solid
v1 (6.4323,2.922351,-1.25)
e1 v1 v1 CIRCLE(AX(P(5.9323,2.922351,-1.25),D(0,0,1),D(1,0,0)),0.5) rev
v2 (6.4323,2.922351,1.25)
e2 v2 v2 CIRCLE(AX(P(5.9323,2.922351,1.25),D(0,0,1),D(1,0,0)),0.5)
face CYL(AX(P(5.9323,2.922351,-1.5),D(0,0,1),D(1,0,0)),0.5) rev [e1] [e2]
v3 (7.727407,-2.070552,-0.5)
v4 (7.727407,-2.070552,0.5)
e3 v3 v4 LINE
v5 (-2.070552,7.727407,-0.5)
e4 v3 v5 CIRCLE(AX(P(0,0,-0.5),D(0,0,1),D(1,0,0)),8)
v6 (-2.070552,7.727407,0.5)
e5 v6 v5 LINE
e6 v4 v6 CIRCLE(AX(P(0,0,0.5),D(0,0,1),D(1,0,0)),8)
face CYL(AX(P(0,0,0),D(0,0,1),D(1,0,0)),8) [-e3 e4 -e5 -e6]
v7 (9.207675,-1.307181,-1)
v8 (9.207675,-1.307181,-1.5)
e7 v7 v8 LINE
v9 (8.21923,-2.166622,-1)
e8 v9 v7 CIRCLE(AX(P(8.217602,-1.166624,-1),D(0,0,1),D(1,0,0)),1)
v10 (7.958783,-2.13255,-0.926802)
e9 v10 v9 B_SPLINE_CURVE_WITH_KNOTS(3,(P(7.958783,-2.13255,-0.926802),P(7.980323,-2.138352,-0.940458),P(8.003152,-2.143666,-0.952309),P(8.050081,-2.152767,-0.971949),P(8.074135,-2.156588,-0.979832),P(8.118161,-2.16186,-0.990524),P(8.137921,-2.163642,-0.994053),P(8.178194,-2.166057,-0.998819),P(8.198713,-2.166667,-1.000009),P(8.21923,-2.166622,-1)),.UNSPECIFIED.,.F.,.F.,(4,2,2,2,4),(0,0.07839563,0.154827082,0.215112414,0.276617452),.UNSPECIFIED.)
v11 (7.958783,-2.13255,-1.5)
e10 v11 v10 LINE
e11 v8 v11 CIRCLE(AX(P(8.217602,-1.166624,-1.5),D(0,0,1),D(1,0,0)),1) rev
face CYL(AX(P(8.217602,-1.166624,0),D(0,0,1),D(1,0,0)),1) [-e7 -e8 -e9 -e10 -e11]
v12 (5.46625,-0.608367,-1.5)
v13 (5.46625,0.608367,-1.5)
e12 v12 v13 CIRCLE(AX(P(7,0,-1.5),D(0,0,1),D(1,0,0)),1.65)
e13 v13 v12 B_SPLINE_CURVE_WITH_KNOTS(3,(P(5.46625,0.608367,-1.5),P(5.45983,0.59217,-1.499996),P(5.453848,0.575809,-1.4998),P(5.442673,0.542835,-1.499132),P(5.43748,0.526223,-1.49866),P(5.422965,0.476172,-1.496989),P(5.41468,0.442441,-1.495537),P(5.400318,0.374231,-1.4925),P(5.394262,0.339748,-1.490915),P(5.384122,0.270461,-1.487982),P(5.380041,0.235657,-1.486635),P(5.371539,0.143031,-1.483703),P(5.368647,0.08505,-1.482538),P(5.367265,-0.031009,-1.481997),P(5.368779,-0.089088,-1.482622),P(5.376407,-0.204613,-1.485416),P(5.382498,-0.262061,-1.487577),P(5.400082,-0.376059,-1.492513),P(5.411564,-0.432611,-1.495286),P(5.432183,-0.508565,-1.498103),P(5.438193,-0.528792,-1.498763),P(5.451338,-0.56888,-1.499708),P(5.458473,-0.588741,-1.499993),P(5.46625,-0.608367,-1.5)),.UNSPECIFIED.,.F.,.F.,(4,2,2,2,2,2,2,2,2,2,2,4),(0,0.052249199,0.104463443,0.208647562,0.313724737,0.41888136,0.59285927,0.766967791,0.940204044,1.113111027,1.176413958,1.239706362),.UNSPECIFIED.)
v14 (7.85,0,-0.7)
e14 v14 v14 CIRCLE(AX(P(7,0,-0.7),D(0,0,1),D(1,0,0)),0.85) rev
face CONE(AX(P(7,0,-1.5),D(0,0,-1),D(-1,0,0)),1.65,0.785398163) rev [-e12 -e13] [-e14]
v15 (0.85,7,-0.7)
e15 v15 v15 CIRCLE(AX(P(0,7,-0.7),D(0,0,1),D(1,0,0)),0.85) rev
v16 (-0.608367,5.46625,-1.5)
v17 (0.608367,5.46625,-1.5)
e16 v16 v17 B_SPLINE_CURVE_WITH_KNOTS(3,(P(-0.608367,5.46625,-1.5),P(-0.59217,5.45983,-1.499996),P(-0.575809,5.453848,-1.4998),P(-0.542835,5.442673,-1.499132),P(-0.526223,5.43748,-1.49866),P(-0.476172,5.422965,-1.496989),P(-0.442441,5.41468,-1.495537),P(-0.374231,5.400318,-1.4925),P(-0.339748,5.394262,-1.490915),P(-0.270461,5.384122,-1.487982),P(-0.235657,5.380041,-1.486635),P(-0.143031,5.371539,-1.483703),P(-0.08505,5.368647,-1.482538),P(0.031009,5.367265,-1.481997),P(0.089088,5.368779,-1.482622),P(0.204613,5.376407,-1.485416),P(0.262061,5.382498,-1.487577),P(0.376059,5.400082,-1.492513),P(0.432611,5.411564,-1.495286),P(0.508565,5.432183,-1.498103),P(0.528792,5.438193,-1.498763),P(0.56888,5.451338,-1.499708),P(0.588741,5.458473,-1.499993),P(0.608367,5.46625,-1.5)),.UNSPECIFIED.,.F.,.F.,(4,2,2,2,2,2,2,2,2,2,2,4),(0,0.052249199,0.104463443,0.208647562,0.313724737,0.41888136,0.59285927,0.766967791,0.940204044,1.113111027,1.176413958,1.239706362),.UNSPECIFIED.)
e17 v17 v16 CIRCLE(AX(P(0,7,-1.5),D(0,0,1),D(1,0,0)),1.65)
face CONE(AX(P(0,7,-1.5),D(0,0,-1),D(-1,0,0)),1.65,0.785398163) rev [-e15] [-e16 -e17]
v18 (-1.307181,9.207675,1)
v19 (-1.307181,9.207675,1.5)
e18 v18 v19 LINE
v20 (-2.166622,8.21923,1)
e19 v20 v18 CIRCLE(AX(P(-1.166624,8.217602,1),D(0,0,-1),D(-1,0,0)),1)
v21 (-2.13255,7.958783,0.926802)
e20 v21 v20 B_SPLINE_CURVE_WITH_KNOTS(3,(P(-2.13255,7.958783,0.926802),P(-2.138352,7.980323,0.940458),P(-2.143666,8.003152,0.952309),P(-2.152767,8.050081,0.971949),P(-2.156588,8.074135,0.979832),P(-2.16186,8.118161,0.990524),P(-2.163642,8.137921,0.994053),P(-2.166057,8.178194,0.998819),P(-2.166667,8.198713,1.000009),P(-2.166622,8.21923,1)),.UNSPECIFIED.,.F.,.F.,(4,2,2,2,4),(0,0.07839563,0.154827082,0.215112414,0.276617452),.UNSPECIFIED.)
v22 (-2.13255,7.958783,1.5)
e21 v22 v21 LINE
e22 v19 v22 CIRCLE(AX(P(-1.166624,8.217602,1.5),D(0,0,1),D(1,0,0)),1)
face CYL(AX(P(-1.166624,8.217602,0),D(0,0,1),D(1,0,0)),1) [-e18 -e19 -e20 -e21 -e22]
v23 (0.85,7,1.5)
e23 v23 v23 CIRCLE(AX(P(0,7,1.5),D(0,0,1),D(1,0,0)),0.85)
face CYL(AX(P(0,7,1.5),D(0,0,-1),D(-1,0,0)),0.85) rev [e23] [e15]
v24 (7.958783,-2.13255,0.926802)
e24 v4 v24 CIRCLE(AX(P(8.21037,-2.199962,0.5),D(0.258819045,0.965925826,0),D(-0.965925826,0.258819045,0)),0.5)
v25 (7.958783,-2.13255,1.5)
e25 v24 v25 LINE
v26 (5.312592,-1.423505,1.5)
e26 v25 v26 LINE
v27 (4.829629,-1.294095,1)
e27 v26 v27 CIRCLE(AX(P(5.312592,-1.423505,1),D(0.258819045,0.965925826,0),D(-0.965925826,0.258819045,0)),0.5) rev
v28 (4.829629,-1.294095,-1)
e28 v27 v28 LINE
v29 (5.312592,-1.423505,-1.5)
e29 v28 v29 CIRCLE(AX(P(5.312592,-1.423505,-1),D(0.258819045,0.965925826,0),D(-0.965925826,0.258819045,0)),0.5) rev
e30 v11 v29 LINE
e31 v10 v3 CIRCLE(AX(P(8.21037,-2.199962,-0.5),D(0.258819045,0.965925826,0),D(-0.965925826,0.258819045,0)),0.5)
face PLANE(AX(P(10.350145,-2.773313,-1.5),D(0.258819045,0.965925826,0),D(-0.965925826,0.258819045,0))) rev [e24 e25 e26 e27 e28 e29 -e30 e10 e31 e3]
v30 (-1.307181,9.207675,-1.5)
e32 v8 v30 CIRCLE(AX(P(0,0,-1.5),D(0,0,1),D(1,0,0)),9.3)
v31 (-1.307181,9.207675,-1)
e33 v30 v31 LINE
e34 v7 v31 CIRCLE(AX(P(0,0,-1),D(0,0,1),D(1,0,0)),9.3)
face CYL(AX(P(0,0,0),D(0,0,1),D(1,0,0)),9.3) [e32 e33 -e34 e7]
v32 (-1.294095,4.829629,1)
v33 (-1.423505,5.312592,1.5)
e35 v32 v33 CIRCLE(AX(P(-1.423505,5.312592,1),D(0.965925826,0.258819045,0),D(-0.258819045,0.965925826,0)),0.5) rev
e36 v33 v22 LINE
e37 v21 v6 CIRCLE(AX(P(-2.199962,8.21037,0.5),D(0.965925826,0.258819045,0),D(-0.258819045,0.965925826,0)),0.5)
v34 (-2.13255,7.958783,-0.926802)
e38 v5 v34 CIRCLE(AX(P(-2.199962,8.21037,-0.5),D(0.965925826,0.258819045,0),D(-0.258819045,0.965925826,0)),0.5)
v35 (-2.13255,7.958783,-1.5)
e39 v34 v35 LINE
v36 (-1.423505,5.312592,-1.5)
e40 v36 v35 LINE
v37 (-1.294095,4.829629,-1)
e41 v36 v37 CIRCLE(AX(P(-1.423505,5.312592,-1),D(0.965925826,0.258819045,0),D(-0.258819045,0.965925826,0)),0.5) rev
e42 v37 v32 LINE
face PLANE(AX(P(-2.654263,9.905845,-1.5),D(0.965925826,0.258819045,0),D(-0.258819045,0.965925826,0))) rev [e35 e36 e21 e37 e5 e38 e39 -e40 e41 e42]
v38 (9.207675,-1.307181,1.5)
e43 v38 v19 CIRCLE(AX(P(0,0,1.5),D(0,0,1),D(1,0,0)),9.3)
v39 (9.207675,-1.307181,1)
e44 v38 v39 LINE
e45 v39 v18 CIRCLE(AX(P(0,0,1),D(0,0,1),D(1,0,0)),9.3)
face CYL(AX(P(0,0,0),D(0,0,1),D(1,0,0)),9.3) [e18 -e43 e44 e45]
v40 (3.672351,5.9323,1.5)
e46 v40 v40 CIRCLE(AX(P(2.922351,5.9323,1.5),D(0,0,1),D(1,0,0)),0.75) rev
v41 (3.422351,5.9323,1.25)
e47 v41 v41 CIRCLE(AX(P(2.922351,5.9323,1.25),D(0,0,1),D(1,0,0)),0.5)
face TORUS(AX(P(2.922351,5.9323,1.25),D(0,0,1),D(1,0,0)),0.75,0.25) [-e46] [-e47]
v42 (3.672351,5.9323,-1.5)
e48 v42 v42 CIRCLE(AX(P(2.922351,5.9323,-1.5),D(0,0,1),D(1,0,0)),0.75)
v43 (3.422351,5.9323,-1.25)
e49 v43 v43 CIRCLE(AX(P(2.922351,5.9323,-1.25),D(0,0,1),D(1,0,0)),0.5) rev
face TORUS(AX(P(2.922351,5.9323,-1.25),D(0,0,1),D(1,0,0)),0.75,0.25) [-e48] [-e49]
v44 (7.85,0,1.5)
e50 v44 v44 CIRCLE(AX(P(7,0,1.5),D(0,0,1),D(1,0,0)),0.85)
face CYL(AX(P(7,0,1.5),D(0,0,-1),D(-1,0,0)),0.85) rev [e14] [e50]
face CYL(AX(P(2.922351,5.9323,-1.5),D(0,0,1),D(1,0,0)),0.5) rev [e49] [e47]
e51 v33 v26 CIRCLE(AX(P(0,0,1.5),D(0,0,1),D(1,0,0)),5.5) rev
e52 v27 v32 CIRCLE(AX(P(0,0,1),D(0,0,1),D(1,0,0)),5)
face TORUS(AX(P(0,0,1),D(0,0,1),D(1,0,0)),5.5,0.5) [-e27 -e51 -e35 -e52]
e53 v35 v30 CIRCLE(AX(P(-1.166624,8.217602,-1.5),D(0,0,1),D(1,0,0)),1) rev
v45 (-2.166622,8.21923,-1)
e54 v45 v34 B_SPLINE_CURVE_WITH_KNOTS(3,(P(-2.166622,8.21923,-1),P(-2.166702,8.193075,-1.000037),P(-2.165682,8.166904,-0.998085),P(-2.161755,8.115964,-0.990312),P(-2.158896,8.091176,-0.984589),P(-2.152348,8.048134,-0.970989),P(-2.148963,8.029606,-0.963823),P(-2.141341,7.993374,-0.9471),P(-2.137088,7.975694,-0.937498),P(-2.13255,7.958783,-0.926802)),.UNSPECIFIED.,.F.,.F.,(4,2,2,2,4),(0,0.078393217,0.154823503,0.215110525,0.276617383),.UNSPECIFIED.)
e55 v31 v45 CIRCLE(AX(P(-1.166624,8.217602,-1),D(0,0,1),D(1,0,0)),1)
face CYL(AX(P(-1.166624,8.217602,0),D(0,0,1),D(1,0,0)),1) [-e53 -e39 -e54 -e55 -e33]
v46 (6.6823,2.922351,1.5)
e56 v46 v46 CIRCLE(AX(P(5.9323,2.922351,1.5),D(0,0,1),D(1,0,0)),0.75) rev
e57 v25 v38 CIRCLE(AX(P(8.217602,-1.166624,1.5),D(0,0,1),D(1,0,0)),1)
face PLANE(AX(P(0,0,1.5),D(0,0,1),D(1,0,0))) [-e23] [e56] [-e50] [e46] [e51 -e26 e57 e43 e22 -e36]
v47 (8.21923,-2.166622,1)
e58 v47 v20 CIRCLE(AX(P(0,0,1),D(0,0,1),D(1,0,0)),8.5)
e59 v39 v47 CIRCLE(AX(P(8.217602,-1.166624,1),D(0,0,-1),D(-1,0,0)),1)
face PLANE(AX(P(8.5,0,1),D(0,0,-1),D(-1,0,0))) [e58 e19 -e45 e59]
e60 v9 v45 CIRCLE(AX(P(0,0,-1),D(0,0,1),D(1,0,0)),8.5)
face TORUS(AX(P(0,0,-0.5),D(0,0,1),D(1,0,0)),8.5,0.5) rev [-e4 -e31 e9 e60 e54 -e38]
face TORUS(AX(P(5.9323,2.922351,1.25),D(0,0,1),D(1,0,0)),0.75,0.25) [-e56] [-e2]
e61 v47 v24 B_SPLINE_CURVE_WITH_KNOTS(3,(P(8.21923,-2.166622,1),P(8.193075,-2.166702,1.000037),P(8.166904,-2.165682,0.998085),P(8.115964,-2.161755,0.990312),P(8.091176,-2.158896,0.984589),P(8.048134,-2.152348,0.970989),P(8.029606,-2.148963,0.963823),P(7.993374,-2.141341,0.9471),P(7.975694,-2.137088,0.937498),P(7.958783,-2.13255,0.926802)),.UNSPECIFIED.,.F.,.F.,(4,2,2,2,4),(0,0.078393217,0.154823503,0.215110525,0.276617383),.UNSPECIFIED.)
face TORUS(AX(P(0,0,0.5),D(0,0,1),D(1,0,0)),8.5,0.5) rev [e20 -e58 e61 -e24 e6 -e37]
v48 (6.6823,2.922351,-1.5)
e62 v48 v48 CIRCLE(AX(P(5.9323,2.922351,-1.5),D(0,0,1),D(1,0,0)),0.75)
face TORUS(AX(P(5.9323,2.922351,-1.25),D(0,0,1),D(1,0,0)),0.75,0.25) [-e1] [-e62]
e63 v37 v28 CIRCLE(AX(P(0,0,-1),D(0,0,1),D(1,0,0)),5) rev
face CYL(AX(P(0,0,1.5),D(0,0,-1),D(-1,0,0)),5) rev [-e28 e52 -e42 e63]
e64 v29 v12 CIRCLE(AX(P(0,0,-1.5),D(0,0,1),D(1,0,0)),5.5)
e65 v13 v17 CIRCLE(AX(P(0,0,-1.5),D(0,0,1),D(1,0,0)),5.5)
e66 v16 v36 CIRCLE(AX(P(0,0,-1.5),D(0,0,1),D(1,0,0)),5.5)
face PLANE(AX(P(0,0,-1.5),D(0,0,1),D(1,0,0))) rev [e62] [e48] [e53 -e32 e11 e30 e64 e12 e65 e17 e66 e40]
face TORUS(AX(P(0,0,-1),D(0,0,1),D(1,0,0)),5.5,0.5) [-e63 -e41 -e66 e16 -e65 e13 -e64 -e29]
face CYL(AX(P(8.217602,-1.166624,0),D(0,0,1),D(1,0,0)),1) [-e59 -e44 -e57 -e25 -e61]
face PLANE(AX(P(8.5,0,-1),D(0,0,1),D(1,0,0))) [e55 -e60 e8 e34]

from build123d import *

# Parameters (mm, degrees)
SKETCH1_R               = 8.5
SKETCH1_R_2             = 0.85
SKETCH1_R_3             = 5
BOSS_EXTRUDE1_DEPTH     = 1.5
SKETCH7_W               = 0.8
SKETCH7_H               = 0.5
CUT_EXTRUDE1_DEPTH      = 14.237446884
CUT_EXTRUDE1_DEPTH_BACK = 14.237446884
CUT_EXTRUDE2_DEPTH      = 14.489996294
CUT_EXTRUDE2_DEPTH_BACK = 14.489996294
SKETCH5_R               = 0.5
FILLET1_R               = 0.5
FILLET2_R               = 1
CHAMFER1_SIZE           = 0.8
FILLET3_R               = 0.25


with BuildPart() as part:
    # Sketch1 → Boss-Extrude1 (new, symmetric)
    with BuildSketch(Plane.XY):
        Circle(SKETCH1_R)
        with Locations((7, 0)):
            Circle(SKETCH1_R_2, mode=Mode.SUBTRACT)
        Circle(SKETCH1_R_3, mode=Mode.SUBTRACT)
        with Locations((0, -7)):
            Circle(SKETCH1_R_2, mode=Mode.SUBTRACT)
        with Locations((-7, 0)):
            Circle(SKETCH1_R_2, mode=Mode.SUBTRACT)
        with Locations((0, 7)):
            Circle(SKETCH1_R_2, mode=Mode.SUBTRACT)
    extrude(amount=BOSS_EXTRUDE1_DEPTH, both=True)

    # Sketch2 → Cut-Revolve1 (revolve, cut)
    with BuildSketch(Plane(origin=(0, 0, 0), x_dir=(1, 0, 0), z_dir=(0, 1, 0)), mode=Mode.PRIVATE) as cut_revolve1_sk:
        with BuildLine():
            Line((-8, 0.5), (-8, -0.5))
            ThreePointArc((-8, -0.5), (-8.146446609, -0.853553391), (-8.5, -1))
            Line((-8.5, -1), (-8.5, 1))
            ThreePointArc((-8.5, 1), (-8.146446609, 0.853553391), (-8, 0.5))
        make_face()
    revolve(cut_revolve1_sk.sketch.rotate(Axis((0, 0, 0), (0, 0, -1)), 180), axis=Axis((0, 0, 0), (0, 0, -1)), mode=Mode.SUBTRACT)

    # Sketch7 → Revolve1 (revolve)
    with BuildSketch(Plane(origin=(0, 0, 0), x_dir=(1, 0, 0), z_dir=(0, 1, 0))):
        with Locations((8.9, 1.25)):
            Rectangle(SKETCH7_W, SKETCH7_H)
        with Locations((8.9, -1.25)):
            Rectangle(SKETCH7_W, SKETCH7_H)
    revolve(axis=Axis((0, 0, 0), (0, 0, -1)))

    # Sketch4 → Cut-Extrude1 (cut, two sides: drawn at the far end of the back side and taken through both)
    with BuildSketch(Plane.XY.offset(-CUT_EXTRUDE1_DEPTH_BACK)):
        Polygon((-2.654263152, 9.905844942), (0, 0), (10.350145374, -2.773313095), (10.350145374, -11.033622271), (-11.334173843, -11.033622271), (-11.334173843, 9.905844942), align=None)
    extrude(amount=CUT_EXTRUDE1_DEPTH + CUT_EXTRUDE1_DEPTH_BACK, mode=Mode.SUBTRACT)

    # Sketch5 → Cut-Extrude2 (cut, two sides: drawn at the far end of the back side and taken through both)
    with BuildSketch(Plane.XY.offset(1.5).offset(-CUT_EXTRUDE2_DEPTH_BACK)):
        with Locations((2.922350839, 5.932300352)):
            Circle(SKETCH5_R)
        with Locations((5.932300352, 2.922350839)):
            Circle(SKETCH5_R)
    extrude(amount=CUT_EXTRUDE2_DEPTH + CUT_EXTRUDE2_DEPTH_BACK, mode=Mode.SUBTRACT)

    # Fillet1
    fillet1_edges = [part.edges().sort_by_distance(p)[0] for p in [
        (3.535533906, 3.535533906, 1.5),
        (3.535533906, 3.535533906, -1.5),
    ]]
    fillet(fillet1_edges, radius=FILLET1_R)

    # Fillet2
    fillet2_edges = [part.edges().sort_by_distance(p)[0] for p in [
        (8.983110184, -2.407017119, -1.25),
        (8.983110184, -2.407017119, 1.25),
        (-2.407017119, 8.983110184, -1.25),
        (-2.407017119, 8.983110184, 1.25),
    ]]
    fillet(fillet2_edges, radius=FILLET2_R)

    # Chamfer1
    # the kernel refuses this chamfer: 0.8 mm, written as the material it takes off along each edge
    with BuildSketch(Plane(origin=(7, 0, -1.5), x_dir=(1, 0, 0), z_dir=(0, -1, 0))) as chamfer1_piece_1:
        Polygon((0.85 + CHAMFER1_SIZE, 0), (0.85, CHAMFER1_SIZE), (0.85, 0), align=None)
    revolve(axis=Axis((7, 0, -1.5), (0, 0, 1)), mode=Mode.SUBTRACT)
    with BuildSketch(Plane(origin=(0, 7, -1.5), x_dir=(1, 0, 0), z_dir=(0, -1, 0))) as chamfer1_piece_2:
        Polygon((0.85 + CHAMFER1_SIZE, 0), (0.85, CHAMFER1_SIZE), (0.85, 0), align=None)
    revolve(axis=Axis((0, 7, -1.5), (0, 0, 1)), mode=Mode.SUBTRACT)

    # Fillet3
    fillet3_edges = [part.edges().sort_by_distance(p)[0] for p in [
        (2.422350839, 5.932300352, 1.5),
        (2.422350839, 5.932300352, -1.5),
        (5.432300352, 2.922350839, 1.5),
        (5.432300352, 2.922350839, -1.5),
    ]]
    fillet(fillet3_edges, radius=FILLET3_R)


solid = part.part
